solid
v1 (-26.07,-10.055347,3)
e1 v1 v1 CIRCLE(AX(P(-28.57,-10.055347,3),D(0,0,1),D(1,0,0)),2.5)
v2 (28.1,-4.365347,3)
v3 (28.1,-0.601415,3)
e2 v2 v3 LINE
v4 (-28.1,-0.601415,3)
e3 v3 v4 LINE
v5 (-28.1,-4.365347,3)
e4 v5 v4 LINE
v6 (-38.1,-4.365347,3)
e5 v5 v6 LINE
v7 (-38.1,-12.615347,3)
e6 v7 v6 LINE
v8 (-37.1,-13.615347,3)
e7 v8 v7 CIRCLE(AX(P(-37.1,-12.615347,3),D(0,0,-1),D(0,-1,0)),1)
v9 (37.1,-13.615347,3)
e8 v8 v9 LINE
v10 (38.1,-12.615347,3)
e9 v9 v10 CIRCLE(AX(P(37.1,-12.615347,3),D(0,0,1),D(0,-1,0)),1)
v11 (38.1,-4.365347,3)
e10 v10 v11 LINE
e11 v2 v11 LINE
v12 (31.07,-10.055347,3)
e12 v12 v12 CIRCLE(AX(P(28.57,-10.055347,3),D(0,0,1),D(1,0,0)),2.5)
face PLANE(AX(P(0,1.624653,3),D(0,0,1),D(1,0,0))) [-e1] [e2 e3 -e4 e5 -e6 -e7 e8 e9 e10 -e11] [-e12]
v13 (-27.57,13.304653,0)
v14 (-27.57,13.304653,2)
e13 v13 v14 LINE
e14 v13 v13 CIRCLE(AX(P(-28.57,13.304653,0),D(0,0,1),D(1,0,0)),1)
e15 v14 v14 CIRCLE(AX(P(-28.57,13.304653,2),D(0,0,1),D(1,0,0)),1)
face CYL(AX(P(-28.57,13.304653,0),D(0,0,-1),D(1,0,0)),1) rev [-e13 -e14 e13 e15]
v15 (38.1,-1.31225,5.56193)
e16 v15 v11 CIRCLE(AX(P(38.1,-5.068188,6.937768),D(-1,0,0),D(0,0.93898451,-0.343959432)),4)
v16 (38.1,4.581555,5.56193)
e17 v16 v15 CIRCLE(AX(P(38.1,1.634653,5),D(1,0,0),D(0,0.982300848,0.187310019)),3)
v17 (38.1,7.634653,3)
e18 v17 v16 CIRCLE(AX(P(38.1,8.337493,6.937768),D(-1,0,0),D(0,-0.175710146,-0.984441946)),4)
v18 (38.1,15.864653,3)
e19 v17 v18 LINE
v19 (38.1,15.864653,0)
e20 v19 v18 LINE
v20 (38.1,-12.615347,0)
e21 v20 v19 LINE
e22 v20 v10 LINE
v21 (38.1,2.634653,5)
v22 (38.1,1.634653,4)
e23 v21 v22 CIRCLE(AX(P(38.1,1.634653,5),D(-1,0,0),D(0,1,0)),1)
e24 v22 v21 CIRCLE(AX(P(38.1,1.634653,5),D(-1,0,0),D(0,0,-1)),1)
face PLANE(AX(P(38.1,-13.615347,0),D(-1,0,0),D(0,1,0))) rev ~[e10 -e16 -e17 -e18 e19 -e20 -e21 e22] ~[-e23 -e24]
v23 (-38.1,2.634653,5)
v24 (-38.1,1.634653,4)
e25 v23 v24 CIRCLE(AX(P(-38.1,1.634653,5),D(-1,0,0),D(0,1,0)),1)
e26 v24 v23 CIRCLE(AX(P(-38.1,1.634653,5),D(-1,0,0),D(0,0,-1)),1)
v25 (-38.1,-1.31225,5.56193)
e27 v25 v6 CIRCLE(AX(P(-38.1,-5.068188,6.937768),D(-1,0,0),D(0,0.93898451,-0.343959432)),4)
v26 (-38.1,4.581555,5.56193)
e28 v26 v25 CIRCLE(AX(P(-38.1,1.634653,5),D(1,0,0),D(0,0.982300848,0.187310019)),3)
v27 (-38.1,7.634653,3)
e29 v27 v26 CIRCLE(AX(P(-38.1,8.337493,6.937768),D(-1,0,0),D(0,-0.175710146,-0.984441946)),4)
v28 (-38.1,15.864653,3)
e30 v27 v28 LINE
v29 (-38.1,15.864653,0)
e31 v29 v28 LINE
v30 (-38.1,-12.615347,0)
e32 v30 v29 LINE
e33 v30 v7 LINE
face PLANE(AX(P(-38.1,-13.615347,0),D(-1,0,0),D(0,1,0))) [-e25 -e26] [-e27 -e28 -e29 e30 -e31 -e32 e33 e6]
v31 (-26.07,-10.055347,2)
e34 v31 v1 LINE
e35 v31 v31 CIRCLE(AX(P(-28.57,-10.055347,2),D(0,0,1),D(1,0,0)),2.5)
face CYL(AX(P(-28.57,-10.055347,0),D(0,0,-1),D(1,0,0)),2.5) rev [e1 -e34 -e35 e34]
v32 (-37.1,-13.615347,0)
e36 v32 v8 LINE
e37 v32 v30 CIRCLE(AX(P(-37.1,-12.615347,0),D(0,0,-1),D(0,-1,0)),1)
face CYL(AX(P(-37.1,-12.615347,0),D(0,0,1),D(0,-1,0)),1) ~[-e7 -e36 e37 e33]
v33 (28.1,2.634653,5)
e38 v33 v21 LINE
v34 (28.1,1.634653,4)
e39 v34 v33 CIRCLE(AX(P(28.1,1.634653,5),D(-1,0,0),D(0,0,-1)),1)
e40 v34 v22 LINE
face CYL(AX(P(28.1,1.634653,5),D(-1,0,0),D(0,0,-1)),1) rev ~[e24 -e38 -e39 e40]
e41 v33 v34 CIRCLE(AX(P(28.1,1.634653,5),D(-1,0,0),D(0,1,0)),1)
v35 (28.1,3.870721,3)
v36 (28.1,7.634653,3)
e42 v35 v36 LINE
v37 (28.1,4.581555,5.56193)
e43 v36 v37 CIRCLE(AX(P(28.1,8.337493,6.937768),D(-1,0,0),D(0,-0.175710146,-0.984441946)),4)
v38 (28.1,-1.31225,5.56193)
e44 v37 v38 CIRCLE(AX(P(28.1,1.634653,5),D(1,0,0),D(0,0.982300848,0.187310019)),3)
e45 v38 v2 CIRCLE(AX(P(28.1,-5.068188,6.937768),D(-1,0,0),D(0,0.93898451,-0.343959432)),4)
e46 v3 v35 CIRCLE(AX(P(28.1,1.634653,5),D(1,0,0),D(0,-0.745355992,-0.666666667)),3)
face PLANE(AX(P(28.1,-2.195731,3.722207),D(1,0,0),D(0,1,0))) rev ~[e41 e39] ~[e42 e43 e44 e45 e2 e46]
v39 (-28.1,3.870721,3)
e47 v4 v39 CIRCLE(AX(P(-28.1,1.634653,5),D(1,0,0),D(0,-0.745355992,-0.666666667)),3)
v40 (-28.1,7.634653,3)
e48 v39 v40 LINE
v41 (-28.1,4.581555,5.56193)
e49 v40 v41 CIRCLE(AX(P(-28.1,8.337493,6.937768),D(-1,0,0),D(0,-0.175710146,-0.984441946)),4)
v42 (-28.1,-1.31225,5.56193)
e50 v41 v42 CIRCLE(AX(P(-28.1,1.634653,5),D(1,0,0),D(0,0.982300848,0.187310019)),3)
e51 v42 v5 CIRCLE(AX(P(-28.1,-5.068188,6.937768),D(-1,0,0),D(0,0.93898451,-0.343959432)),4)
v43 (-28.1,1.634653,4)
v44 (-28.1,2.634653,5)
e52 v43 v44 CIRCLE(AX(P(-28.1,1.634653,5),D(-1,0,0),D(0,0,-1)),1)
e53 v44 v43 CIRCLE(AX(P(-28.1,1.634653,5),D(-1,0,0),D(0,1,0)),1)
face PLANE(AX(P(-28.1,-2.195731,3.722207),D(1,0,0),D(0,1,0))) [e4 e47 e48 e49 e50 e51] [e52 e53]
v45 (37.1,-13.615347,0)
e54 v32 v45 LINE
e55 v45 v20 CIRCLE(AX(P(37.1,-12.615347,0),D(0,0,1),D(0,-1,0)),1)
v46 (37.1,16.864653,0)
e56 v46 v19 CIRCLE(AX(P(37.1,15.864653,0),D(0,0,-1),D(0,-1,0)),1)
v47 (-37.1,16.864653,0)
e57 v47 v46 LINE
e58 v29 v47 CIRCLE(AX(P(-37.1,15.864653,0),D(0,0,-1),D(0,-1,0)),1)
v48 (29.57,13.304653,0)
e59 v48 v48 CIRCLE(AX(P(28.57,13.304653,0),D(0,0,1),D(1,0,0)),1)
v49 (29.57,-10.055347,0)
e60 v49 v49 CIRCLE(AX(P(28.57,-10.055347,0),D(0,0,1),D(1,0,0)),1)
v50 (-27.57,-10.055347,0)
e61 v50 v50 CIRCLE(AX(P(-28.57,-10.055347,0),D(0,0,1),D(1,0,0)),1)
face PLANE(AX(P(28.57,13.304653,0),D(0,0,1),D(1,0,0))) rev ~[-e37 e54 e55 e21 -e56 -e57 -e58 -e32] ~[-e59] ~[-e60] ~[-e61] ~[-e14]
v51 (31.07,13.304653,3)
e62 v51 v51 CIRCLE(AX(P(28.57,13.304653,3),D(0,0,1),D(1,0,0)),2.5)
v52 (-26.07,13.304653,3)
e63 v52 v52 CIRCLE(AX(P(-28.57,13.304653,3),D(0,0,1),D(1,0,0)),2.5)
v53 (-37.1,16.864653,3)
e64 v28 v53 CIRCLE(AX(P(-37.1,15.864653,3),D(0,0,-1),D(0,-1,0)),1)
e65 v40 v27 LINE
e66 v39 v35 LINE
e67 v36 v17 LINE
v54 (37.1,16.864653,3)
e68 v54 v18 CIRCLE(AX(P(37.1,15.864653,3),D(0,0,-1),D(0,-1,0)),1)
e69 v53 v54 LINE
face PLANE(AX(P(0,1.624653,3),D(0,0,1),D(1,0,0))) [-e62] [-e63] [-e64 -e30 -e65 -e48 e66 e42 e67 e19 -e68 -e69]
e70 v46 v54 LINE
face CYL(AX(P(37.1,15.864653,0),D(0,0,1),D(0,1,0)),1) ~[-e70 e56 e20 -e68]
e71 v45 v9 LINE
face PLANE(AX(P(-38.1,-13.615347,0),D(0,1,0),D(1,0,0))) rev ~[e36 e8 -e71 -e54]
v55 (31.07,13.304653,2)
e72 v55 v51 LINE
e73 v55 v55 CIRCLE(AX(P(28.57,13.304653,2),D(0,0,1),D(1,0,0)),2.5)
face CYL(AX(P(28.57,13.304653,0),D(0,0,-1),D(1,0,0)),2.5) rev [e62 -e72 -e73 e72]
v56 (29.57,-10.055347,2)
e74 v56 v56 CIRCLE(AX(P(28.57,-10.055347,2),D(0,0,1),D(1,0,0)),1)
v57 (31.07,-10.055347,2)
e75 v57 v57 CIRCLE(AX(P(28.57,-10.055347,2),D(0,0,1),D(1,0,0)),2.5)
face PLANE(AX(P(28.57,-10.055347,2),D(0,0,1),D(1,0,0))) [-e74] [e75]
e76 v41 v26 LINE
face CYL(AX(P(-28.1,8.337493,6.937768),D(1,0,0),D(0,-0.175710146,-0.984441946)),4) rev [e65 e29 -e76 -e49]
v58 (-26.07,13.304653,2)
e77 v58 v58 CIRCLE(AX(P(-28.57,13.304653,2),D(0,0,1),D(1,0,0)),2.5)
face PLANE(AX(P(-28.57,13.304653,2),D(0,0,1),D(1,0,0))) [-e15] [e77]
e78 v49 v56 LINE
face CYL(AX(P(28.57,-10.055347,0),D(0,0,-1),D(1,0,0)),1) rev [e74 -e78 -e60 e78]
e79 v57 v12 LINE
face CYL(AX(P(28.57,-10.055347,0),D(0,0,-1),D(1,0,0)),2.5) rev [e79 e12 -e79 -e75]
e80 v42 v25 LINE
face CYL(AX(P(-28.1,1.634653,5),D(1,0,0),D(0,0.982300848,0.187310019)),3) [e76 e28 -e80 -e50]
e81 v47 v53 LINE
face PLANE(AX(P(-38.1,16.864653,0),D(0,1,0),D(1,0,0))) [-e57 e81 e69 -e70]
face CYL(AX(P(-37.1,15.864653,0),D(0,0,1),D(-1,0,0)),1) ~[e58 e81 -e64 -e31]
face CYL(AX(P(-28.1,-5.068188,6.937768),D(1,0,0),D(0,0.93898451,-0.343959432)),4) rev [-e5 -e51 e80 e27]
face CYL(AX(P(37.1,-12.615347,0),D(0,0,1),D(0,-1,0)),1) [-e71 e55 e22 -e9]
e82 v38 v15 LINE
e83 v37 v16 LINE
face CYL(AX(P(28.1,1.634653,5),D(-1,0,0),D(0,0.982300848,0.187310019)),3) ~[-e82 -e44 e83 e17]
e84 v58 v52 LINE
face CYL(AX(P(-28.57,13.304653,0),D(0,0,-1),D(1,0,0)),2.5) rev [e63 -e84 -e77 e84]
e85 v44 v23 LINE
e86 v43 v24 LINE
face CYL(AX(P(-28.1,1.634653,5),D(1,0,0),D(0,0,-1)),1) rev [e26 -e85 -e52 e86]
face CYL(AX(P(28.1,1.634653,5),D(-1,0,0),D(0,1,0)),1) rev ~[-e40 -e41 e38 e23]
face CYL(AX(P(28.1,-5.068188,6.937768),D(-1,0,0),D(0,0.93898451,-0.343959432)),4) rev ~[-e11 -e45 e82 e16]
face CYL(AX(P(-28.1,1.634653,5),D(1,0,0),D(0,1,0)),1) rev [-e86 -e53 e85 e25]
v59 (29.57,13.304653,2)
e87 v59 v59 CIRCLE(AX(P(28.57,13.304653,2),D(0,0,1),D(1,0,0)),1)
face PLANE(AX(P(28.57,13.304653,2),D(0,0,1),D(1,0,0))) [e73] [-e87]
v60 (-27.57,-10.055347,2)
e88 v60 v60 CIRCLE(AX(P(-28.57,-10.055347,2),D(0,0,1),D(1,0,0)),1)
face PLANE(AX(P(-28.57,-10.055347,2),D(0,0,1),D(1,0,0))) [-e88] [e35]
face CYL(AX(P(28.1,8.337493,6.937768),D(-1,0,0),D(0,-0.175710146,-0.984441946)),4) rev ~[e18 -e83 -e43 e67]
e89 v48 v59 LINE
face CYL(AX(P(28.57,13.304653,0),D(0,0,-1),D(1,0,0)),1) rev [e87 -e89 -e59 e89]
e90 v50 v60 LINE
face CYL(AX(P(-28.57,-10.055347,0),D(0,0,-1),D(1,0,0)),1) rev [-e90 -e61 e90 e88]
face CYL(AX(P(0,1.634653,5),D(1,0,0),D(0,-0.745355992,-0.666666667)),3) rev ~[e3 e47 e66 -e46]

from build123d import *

# Parameters (mm, degrees)
F0_W          = 76.2
F0_H          = 30.48
F0_R          = 2.5
F2_DEPTH      = 3
F0_R_2        = 1
F3_DEPTH      = 2
F4_START      = 28.1
F4_DEPTH      = 10
F5_START      = -28.1
F5_DEPTH      = 10
F6_DEPTH      = 28.1
F6_DEPTH_BACK = 28.1
F7_R          = 1


with BuildPart() as f2:
    # F0 (on Top) → F2 (new body)
    with BuildSketch(Plane.XY):
        with Locations((0, 1.624652555)):
            Rectangle(F0_W, F0_H)
        with Locations((-28.57, -10.055347445)):
            Circle(F0_R, mode=Mode.SUBTRACT)
        with Locations((28.57, -10.055347445)):
            Circle(F0_R, mode=Mode.SUBTRACT)
        with Locations((-28.57, 13.304652555)):
            Circle(F0_R, mode=Mode.SUBTRACT)
        with Locations((28.57, 13.304652555)):
            Circle(F0_R, mode=Mode.SUBTRACT)
    extrude(amount=F2_DEPTH)

    # F0 (on Top) → F3 (join)
    with BuildSketch(Plane.XY):
        with Locations((28.57, 13.304652555)):
            Circle(F0_R)
        with Locations((28.57, 13.304652555)):
            Circle(F0_R_2, mode=Mode.SUBTRACT)
        with Locations((28.57, -10.055347445)):
            Circle(F0_R)
        with Locations((28.57, -10.055347445)):
            Circle(F0_R_2, mode=Mode.SUBTRACT)
        with Locations((-28.57, -10.055347445)):
            Circle(F0_R)
        with Locations((-28.57, -10.055347445)):
            Circle(F0_R_2, mode=Mode.SUBTRACT)
        with Locations((-28.57, 13.304652555)):
            Circle(F0_R)
        with Locations((-28.57, 13.304652555)):
            Circle(F0_R_2, mode=Mode.SUBTRACT)
    extrude(amount=F3_DEPTH)

    # F1 (on Right) → F4 (join)
    with BuildSketch(Plane.YZ.offset(F4_START)):
        with BuildLine():
            ThreePointArc((-1.3122499903, 5.5619300567), (-2.4969921778, 3.8736281168), (-4.365347445, 3))
            Line((-4.365347445, 3), (-0.6014154225, 3))
            ThreePointArc((-0.6014154225, 3), (-1.2561375211, 4.1979197446), (-1.3122499903, 5.5619300567))
        make_face()
        with BuildLine():
            Line((3.8707205325, 3), (7.634652555, 3))
            ThreePointArc((7.634652555, 3), (5.7662972877, 3.8736281168), (4.5815551003, 5.5619300567))
            ThreePointArc((4.5815551003, 5.5619300567), (4.6213486925, 5.2822165518), (4.634652555, 5))
            ThreePointArc((4.634652555, 5), (4.4371696319, 3.9295337307), (3.8707205325, 3))
        make_face()
        with BuildLine():
            ThreePointArc((-1.3122499903, 5.5619300567), (-1.2561375211, 4.1979197446), (-0.6014154225, 3))
            Line((-0.6014154225, 3), (3.8707205325, 3))
            ThreePointArc((3.8707205325, 3), (4.4371696319, 3.9295337307), (4.634652555, 5))
            ThreePointArc((4.634652555, 5), (4.6213486925, 5.2822165518), (4.5815551003, 5.5619300567))
            ThreePointArc((4.5815551003, 5.5619300567), (1.634652555, 8), (-1.3122499903, 5.5619300567))
        make_face()
        with BuildLine():
            ThreePointArc((1.634652555, 4), (0.9275457738, 5.7071067812), (2.634652555, 5))
            ThreePointArc((2.634652555, 5), (2.3417593362, 4.2928932188), (1.634652555, 4))
        make_face(mode=Mode.SUBTRACT)
    extrude(amount=F4_DEPTH)

    # F1 (on Right) → F5 (join)
    with BuildSketch(Plane.YZ.offset(F5_START)):
        with BuildLine():
            ThreePointArc((-1.3122499903, 5.5619300567), (-2.4969921778, 3.8736281168), (-4.365347445, 3))
            Line((-4.365347445, 3), (-0.6014154225, 3))
            ThreePointArc((-0.6014154225, 3), (-1.2561375211, 4.1979197446), (-1.3122499903, 5.5619300567))
        make_face()
        with BuildLine():
            Line((3.8707205325, 3), (7.634652555, 3))
            ThreePointArc((7.634652555, 3), (5.7662972877, 3.8736281168), (4.5815551003, 5.5619300567))
            ThreePointArc((4.5815551003, 5.5619300567), (4.6213486925, 5.2822165518), (4.634652555, 5))
            ThreePointArc((4.634652555, 5), (4.4371696319, 3.9295337307), (3.8707205325, 3))
        make_face()
        with BuildLine():
            ThreePointArc((-1.3122499903, 5.5619300567), (-1.2561375211, 4.1979197446), (-0.6014154225, 3))
            Line((-0.6014154225, 3), (3.8707205325, 3))
            ThreePointArc((3.8707205325, 3), (4.4371696319, 3.9295337307), (4.634652555, 5))
            ThreePointArc((4.634652555, 5), (4.6213486925, 5.2822165518), (4.5815551003, 5.5619300567))
            ThreePointArc((4.5815551003, 5.5619300567), (1.634652555, 8), (-1.3122499903, 5.5619300567))
        make_face()
        with BuildLine():
            ThreePointArc((1.634652555, 4), (0.9275457738, 5.7071067812), (2.634652555, 5))
            ThreePointArc((2.634652555, 5), (2.3417593362, 4.2928932188), (1.634652555, 4))
        make_face(mode=Mode.SUBTRACT)
    extrude(amount=-F5_DEPTH)

    # F1 (on Right) → F6 (cut, two sides)
    with BuildSketch(Plane.YZ) as f6_sk:
        with BuildLine():
            Line((3.8707205325, 3), (-0.6014154225, 3))
            ThreePointArc((-0.6014154225, 3), (1.634652555, 2), (3.8707205325, 3))
        make_face()
    extrude(amount=-F6_DEPTH, mode=Mode.SUBTRACT)
    extrude(f6_sk.sketch, amount=F6_DEPTH_BACK, mode=Mode.SUBTRACT)

    # F7
    f7_edges = [f2.edges().sort_by_distance(p)[0] for p in [
        (38.1, -13.615347, 1.5),
        (38.1, 16.864653, 1.5),
        (-38.1, 16.864653, 1.5),
        (-38.1, -13.615347, 1.5),
    ]]
    fillet(f7_edges, radius=F7_R)


solid = f2.part
